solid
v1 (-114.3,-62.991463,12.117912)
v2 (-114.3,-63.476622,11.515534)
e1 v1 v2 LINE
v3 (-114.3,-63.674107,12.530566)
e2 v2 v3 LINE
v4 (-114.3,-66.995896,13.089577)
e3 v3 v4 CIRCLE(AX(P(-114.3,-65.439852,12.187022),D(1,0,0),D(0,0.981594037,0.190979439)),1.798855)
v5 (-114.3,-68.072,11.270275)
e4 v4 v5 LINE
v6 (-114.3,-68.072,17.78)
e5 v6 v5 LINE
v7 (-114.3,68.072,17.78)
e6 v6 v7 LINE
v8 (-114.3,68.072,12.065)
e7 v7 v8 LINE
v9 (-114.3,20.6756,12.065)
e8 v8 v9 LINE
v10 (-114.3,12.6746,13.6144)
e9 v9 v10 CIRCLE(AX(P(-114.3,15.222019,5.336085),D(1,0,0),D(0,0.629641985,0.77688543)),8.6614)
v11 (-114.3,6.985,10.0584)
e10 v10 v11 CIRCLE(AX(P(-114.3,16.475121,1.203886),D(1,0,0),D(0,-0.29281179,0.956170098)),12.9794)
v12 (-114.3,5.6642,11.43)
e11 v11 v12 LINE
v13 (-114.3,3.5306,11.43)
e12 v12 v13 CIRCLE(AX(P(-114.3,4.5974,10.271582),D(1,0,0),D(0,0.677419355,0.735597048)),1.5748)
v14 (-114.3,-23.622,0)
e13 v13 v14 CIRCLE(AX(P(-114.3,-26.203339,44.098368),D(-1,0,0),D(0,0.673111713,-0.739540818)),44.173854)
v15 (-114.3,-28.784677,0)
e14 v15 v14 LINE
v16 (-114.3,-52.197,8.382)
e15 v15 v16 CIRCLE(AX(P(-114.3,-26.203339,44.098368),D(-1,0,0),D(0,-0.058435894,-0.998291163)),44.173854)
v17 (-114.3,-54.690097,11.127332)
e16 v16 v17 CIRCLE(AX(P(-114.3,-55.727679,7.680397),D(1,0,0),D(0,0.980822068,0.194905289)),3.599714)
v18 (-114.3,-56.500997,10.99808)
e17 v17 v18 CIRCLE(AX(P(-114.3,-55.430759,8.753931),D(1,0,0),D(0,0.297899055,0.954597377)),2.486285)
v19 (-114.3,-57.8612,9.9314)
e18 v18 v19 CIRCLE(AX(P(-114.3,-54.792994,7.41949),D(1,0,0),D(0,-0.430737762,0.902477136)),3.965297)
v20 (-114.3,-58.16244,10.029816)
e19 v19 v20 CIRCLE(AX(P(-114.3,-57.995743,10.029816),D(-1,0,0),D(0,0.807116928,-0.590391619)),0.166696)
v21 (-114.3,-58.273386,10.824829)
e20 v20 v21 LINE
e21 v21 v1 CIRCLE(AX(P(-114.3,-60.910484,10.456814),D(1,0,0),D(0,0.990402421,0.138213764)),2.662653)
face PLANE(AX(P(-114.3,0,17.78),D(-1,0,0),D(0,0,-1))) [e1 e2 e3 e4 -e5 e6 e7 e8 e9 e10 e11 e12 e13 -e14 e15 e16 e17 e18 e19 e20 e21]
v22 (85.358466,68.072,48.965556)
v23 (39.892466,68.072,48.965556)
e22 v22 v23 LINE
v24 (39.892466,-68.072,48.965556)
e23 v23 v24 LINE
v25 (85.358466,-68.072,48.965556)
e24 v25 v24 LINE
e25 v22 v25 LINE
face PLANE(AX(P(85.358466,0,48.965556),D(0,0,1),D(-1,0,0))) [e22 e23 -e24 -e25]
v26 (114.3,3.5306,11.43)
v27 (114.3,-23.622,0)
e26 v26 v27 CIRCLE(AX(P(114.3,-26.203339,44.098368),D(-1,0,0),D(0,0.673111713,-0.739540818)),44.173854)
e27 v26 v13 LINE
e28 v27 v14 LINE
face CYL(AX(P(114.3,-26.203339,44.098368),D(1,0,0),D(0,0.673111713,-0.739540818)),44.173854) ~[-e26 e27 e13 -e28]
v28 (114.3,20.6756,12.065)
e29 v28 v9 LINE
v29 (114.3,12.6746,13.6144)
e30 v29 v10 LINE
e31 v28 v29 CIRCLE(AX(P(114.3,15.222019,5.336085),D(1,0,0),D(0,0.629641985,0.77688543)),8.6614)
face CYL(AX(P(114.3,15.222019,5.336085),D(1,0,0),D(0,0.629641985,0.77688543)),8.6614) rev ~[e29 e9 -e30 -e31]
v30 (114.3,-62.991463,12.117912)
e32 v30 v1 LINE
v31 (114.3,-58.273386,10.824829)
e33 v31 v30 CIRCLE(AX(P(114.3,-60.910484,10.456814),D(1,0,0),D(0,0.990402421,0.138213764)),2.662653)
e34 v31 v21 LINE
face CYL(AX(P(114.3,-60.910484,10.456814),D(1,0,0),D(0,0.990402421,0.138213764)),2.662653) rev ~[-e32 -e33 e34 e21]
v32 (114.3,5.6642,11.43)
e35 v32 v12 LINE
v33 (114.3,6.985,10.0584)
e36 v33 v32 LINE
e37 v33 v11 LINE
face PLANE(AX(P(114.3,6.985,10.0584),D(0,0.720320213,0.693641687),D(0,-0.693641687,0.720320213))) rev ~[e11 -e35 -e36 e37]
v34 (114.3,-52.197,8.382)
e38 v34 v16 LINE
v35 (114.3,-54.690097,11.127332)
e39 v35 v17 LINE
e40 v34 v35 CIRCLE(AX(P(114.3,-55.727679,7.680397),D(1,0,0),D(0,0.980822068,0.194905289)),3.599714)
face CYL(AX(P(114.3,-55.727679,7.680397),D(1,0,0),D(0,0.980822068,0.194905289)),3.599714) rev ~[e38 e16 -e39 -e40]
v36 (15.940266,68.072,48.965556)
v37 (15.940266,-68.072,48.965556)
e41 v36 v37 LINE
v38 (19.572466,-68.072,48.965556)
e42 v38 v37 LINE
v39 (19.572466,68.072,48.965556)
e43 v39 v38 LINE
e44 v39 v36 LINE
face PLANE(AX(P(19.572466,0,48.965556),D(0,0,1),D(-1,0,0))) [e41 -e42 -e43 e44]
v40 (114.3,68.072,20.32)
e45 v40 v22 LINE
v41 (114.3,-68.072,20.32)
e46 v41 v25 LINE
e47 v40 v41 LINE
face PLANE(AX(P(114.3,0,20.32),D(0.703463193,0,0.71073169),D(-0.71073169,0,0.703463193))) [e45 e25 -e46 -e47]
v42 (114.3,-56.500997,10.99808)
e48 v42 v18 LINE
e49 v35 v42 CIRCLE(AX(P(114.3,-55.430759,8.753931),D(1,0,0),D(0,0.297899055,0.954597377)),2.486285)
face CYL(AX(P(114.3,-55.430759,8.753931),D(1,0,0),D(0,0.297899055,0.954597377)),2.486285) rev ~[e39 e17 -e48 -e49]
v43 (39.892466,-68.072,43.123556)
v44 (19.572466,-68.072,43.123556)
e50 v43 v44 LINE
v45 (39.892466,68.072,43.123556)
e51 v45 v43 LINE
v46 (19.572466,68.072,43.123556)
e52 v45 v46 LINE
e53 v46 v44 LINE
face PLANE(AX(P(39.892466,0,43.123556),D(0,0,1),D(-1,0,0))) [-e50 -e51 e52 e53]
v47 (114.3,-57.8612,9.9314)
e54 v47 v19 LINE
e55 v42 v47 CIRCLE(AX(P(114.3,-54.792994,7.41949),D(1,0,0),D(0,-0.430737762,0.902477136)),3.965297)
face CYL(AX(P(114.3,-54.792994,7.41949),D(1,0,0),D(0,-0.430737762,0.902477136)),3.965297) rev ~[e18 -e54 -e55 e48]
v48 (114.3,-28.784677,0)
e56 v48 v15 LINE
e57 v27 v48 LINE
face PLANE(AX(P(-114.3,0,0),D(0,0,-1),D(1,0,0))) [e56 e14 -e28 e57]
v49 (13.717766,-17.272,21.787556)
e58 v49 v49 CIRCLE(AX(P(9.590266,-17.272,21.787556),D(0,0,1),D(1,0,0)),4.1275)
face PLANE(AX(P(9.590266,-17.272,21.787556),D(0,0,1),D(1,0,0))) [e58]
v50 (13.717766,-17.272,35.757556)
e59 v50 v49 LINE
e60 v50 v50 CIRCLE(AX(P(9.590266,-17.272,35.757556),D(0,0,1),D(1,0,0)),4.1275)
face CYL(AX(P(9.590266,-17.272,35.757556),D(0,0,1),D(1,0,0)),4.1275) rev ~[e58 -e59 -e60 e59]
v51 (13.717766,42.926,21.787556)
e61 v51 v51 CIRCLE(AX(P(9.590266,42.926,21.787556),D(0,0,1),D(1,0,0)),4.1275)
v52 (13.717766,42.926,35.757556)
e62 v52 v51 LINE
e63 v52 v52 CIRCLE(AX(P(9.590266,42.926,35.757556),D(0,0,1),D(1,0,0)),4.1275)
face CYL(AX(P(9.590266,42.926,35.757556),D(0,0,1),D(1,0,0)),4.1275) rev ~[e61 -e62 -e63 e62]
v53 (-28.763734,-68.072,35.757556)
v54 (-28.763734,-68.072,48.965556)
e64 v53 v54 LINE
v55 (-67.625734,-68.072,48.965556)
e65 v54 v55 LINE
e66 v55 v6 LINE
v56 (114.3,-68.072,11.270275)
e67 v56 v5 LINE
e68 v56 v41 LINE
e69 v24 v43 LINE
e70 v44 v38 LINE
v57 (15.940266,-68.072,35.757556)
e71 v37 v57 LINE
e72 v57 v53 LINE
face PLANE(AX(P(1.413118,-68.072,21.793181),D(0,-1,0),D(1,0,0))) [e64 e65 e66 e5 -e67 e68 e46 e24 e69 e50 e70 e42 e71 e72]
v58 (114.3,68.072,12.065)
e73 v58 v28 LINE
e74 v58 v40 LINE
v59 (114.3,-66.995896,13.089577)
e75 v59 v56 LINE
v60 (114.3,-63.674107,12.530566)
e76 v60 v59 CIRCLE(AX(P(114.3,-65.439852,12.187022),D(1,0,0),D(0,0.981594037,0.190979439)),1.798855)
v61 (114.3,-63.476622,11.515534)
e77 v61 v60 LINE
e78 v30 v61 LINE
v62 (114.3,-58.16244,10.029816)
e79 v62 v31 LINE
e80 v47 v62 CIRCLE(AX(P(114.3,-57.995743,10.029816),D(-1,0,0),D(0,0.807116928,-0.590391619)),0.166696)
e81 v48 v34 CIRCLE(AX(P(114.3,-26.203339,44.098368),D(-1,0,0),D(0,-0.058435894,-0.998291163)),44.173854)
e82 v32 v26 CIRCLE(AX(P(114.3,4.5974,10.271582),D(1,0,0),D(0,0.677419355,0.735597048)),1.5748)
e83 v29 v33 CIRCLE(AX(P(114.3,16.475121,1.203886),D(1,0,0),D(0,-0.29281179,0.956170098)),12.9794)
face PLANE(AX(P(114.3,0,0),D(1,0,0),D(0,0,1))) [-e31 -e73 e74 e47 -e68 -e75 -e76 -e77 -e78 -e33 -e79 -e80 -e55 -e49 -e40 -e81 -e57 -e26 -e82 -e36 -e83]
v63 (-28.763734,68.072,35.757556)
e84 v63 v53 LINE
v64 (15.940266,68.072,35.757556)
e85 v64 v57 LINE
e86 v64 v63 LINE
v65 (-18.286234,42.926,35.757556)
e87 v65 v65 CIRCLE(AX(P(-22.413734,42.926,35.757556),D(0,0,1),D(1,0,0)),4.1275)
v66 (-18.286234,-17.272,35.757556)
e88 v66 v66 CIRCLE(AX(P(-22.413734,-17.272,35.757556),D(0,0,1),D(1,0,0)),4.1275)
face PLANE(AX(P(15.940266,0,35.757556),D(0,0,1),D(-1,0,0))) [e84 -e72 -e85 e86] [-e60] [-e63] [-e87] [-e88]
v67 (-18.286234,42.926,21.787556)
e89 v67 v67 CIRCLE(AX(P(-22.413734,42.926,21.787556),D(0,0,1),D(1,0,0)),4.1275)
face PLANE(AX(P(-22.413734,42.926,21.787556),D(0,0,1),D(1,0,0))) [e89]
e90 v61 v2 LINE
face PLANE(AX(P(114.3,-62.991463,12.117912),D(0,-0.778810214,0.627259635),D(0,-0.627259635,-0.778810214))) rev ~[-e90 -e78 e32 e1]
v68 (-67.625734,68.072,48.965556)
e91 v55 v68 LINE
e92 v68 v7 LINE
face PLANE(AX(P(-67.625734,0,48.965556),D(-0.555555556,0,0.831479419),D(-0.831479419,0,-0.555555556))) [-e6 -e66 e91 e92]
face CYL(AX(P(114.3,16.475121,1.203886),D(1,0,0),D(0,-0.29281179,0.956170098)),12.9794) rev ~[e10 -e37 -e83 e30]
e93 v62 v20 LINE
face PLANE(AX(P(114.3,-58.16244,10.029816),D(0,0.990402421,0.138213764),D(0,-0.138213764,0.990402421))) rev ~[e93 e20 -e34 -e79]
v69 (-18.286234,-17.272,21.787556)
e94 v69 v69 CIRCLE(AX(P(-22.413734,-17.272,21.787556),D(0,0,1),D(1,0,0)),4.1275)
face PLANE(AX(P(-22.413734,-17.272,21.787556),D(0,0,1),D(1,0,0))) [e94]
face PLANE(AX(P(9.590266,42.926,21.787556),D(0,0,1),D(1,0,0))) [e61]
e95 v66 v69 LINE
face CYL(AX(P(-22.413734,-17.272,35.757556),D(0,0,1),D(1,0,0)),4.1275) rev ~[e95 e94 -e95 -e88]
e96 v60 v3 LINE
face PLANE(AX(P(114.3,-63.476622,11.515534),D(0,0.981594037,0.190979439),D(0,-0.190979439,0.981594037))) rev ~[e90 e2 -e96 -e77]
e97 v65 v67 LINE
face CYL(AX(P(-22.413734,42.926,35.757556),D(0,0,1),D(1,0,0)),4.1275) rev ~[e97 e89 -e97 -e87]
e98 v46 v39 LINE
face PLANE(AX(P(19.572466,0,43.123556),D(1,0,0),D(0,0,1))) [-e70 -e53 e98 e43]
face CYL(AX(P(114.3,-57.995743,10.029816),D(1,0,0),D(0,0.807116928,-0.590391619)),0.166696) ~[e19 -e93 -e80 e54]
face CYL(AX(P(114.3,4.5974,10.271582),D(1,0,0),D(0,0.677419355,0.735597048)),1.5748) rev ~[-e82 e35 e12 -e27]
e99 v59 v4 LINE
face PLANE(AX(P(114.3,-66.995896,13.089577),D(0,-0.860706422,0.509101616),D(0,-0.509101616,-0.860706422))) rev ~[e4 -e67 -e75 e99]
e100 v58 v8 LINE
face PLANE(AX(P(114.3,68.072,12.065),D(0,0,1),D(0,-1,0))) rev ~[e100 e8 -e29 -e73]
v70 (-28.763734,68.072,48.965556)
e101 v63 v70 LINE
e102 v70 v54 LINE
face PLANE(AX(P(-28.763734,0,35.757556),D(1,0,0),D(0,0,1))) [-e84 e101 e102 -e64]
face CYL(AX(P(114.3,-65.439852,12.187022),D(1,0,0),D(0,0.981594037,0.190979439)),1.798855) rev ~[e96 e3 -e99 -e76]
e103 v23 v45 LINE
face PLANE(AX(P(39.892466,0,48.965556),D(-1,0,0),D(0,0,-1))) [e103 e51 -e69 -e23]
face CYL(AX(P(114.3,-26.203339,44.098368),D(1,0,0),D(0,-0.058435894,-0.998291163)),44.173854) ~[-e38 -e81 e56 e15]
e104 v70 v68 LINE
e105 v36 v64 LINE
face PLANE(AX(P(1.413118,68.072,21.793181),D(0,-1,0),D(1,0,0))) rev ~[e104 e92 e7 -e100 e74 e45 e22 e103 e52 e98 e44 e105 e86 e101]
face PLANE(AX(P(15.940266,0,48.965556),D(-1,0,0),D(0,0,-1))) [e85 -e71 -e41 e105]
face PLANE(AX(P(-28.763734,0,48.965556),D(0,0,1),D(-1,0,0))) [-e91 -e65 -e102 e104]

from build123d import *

# Parameters (mm, degrees)
F1_DEPTH      = 68.072
F1_DEPTH_BACK = 68.072
F2_R          = 4.1275
F3_DEPTH      = 13.97
F5_DEPTH      = 228.6
F6_DEPTH      = 228.6


# Not quite as in the source:
# - a feature names something its author has since deleted; it is built from what else it names


with BuildPart() as f1:
    # F0 (on Front) → F1 (new body, two sides)
    with BuildSketch(Plane.XZ) as f1_sk:
        Polygon((-114.3, 0), (0, 0), (114.3, 0), (114.3, 20.32), (85.358465722, 48.9655555556), (39.892465722, 48.9655555556), (39.892465722, 43.1235555556), (19.572465722, 43.1235555556), (19.572465722, 48.9655555556), (15.940265722, 48.9655555556), (15.940265722, 35.7575555556), (-28.763734278, 35.7575555556), (-28.763734278, 48.9655555556), (-67.625734278, 48.9655555556), (-114.3, 17.78), align=None)
    extrude(amount=F1_DEPTH)
    extrude(f1_sk.sketch, amount=-F1_DEPTH_BACK)

    # F2 (on face) → F3 (cut)
    with BuildSketch(Plane.XY.offset(35.7575555556)):
        with Locations((-22.413734278, 42.926)):
            Circle(F2_R)
        with Locations((9.590265722, 42.926)):
            Circle(F2_R)
        with Locations((9.590265722, -17.272)):
            Circle(F2_R)
        with Locations((-22.413734278, -17.272)):
            Circle(F2_R)
    extrude(amount=-F3_DEPTH, mode=Mode.SUBTRACT)

    # F4 (on face) → F5 (cut)
    with BuildSketch(Plane.YZ.offset(114.3)):
        with BuildLine():
            ThreePointArc((-28.7846772927, 0), (-41.092836195, 2.5095205348), (-52.197, 8.382))
            ThreePointArc((-52.197, 8.382), (-53.0628215245, 10.1004124317), (-54.6900965273, 11.1273322254))
            ThreePointArc((-54.6900965273, 11.1273322254), (-55.6077664174, 11.233907182), (-56.5009973943, 10.9980795532))
            ThreePointArc((-56.5009973943, 10.9980795532), (-57.2399299218, 10.5397598563), (-57.8612, 9.9314))
            ThreePointArc((-57.8612, 9.9314), (-58.0475109479, 9.8713617946), (-58.1624396145, 10.0298160687))
            Line((-58.1624396145, 10.0298160687), (-58.2733862102, 10.82482934))
            ThreePointArc((-58.2733862102, 10.82482934), (-60.2066850368, 13.0247678359), (-62.9914626479, 12.1179120615))
            Line((-62.9914626479, 12.1179120615), (-63.4766221046, 11.5155344829))
            Line((-63.4766221046, 11.5155344829), (-63.6741071939, 12.5305661932))
            ThreePointArc((-63.6741071939, 12.5305661932), (-65.141327886, 13.96093331), (-66.995896399, 13.0895767361))
            Line((-66.995896399, 13.0895767361), (-68.072, 11.2702753395))
            Line((-68.072, 11.2702753395), (-68.072, 0))
            Line((-68.072, 0), (-28.7846772927, 0))
        make_face()
    extrude(amount=-F5_DEPTH, mode=Mode.SUBTRACT)

    # F4 (on face) → F6 (cut)
    with BuildSketch(Plane.YZ.offset(114.3)):
        with BuildLine():
            ThreePointArc((3.5306, 11.43), (-9.0647706891, 3.3847479258), (-23.622, 0))
            Line((-23.622, 0), (68.072, 0))
            Line((68.072, 0), (68.072, 12.065))
            Line((68.072, 12.065), (20.6756, 12.065))
            ThreePointArc((20.6756, 12.065), (16.8687140076, 13.8395100393), (12.6746, 13.6144))
            ThreePointArc((12.6746, 13.6144), (9.5960531105, 12.2103950232), (6.985, 10.0584))
            Line((6.985, 10.0584), (5.6642, 11.43))
            ThreePointArc((5.6642, 11.43), (4.5974, 11.8463817681), (3.5306, 11.43))
        make_face()
    extrude(amount=-F6_DEPTH, mode=Mode.SUBTRACT)


solid = f1.part
